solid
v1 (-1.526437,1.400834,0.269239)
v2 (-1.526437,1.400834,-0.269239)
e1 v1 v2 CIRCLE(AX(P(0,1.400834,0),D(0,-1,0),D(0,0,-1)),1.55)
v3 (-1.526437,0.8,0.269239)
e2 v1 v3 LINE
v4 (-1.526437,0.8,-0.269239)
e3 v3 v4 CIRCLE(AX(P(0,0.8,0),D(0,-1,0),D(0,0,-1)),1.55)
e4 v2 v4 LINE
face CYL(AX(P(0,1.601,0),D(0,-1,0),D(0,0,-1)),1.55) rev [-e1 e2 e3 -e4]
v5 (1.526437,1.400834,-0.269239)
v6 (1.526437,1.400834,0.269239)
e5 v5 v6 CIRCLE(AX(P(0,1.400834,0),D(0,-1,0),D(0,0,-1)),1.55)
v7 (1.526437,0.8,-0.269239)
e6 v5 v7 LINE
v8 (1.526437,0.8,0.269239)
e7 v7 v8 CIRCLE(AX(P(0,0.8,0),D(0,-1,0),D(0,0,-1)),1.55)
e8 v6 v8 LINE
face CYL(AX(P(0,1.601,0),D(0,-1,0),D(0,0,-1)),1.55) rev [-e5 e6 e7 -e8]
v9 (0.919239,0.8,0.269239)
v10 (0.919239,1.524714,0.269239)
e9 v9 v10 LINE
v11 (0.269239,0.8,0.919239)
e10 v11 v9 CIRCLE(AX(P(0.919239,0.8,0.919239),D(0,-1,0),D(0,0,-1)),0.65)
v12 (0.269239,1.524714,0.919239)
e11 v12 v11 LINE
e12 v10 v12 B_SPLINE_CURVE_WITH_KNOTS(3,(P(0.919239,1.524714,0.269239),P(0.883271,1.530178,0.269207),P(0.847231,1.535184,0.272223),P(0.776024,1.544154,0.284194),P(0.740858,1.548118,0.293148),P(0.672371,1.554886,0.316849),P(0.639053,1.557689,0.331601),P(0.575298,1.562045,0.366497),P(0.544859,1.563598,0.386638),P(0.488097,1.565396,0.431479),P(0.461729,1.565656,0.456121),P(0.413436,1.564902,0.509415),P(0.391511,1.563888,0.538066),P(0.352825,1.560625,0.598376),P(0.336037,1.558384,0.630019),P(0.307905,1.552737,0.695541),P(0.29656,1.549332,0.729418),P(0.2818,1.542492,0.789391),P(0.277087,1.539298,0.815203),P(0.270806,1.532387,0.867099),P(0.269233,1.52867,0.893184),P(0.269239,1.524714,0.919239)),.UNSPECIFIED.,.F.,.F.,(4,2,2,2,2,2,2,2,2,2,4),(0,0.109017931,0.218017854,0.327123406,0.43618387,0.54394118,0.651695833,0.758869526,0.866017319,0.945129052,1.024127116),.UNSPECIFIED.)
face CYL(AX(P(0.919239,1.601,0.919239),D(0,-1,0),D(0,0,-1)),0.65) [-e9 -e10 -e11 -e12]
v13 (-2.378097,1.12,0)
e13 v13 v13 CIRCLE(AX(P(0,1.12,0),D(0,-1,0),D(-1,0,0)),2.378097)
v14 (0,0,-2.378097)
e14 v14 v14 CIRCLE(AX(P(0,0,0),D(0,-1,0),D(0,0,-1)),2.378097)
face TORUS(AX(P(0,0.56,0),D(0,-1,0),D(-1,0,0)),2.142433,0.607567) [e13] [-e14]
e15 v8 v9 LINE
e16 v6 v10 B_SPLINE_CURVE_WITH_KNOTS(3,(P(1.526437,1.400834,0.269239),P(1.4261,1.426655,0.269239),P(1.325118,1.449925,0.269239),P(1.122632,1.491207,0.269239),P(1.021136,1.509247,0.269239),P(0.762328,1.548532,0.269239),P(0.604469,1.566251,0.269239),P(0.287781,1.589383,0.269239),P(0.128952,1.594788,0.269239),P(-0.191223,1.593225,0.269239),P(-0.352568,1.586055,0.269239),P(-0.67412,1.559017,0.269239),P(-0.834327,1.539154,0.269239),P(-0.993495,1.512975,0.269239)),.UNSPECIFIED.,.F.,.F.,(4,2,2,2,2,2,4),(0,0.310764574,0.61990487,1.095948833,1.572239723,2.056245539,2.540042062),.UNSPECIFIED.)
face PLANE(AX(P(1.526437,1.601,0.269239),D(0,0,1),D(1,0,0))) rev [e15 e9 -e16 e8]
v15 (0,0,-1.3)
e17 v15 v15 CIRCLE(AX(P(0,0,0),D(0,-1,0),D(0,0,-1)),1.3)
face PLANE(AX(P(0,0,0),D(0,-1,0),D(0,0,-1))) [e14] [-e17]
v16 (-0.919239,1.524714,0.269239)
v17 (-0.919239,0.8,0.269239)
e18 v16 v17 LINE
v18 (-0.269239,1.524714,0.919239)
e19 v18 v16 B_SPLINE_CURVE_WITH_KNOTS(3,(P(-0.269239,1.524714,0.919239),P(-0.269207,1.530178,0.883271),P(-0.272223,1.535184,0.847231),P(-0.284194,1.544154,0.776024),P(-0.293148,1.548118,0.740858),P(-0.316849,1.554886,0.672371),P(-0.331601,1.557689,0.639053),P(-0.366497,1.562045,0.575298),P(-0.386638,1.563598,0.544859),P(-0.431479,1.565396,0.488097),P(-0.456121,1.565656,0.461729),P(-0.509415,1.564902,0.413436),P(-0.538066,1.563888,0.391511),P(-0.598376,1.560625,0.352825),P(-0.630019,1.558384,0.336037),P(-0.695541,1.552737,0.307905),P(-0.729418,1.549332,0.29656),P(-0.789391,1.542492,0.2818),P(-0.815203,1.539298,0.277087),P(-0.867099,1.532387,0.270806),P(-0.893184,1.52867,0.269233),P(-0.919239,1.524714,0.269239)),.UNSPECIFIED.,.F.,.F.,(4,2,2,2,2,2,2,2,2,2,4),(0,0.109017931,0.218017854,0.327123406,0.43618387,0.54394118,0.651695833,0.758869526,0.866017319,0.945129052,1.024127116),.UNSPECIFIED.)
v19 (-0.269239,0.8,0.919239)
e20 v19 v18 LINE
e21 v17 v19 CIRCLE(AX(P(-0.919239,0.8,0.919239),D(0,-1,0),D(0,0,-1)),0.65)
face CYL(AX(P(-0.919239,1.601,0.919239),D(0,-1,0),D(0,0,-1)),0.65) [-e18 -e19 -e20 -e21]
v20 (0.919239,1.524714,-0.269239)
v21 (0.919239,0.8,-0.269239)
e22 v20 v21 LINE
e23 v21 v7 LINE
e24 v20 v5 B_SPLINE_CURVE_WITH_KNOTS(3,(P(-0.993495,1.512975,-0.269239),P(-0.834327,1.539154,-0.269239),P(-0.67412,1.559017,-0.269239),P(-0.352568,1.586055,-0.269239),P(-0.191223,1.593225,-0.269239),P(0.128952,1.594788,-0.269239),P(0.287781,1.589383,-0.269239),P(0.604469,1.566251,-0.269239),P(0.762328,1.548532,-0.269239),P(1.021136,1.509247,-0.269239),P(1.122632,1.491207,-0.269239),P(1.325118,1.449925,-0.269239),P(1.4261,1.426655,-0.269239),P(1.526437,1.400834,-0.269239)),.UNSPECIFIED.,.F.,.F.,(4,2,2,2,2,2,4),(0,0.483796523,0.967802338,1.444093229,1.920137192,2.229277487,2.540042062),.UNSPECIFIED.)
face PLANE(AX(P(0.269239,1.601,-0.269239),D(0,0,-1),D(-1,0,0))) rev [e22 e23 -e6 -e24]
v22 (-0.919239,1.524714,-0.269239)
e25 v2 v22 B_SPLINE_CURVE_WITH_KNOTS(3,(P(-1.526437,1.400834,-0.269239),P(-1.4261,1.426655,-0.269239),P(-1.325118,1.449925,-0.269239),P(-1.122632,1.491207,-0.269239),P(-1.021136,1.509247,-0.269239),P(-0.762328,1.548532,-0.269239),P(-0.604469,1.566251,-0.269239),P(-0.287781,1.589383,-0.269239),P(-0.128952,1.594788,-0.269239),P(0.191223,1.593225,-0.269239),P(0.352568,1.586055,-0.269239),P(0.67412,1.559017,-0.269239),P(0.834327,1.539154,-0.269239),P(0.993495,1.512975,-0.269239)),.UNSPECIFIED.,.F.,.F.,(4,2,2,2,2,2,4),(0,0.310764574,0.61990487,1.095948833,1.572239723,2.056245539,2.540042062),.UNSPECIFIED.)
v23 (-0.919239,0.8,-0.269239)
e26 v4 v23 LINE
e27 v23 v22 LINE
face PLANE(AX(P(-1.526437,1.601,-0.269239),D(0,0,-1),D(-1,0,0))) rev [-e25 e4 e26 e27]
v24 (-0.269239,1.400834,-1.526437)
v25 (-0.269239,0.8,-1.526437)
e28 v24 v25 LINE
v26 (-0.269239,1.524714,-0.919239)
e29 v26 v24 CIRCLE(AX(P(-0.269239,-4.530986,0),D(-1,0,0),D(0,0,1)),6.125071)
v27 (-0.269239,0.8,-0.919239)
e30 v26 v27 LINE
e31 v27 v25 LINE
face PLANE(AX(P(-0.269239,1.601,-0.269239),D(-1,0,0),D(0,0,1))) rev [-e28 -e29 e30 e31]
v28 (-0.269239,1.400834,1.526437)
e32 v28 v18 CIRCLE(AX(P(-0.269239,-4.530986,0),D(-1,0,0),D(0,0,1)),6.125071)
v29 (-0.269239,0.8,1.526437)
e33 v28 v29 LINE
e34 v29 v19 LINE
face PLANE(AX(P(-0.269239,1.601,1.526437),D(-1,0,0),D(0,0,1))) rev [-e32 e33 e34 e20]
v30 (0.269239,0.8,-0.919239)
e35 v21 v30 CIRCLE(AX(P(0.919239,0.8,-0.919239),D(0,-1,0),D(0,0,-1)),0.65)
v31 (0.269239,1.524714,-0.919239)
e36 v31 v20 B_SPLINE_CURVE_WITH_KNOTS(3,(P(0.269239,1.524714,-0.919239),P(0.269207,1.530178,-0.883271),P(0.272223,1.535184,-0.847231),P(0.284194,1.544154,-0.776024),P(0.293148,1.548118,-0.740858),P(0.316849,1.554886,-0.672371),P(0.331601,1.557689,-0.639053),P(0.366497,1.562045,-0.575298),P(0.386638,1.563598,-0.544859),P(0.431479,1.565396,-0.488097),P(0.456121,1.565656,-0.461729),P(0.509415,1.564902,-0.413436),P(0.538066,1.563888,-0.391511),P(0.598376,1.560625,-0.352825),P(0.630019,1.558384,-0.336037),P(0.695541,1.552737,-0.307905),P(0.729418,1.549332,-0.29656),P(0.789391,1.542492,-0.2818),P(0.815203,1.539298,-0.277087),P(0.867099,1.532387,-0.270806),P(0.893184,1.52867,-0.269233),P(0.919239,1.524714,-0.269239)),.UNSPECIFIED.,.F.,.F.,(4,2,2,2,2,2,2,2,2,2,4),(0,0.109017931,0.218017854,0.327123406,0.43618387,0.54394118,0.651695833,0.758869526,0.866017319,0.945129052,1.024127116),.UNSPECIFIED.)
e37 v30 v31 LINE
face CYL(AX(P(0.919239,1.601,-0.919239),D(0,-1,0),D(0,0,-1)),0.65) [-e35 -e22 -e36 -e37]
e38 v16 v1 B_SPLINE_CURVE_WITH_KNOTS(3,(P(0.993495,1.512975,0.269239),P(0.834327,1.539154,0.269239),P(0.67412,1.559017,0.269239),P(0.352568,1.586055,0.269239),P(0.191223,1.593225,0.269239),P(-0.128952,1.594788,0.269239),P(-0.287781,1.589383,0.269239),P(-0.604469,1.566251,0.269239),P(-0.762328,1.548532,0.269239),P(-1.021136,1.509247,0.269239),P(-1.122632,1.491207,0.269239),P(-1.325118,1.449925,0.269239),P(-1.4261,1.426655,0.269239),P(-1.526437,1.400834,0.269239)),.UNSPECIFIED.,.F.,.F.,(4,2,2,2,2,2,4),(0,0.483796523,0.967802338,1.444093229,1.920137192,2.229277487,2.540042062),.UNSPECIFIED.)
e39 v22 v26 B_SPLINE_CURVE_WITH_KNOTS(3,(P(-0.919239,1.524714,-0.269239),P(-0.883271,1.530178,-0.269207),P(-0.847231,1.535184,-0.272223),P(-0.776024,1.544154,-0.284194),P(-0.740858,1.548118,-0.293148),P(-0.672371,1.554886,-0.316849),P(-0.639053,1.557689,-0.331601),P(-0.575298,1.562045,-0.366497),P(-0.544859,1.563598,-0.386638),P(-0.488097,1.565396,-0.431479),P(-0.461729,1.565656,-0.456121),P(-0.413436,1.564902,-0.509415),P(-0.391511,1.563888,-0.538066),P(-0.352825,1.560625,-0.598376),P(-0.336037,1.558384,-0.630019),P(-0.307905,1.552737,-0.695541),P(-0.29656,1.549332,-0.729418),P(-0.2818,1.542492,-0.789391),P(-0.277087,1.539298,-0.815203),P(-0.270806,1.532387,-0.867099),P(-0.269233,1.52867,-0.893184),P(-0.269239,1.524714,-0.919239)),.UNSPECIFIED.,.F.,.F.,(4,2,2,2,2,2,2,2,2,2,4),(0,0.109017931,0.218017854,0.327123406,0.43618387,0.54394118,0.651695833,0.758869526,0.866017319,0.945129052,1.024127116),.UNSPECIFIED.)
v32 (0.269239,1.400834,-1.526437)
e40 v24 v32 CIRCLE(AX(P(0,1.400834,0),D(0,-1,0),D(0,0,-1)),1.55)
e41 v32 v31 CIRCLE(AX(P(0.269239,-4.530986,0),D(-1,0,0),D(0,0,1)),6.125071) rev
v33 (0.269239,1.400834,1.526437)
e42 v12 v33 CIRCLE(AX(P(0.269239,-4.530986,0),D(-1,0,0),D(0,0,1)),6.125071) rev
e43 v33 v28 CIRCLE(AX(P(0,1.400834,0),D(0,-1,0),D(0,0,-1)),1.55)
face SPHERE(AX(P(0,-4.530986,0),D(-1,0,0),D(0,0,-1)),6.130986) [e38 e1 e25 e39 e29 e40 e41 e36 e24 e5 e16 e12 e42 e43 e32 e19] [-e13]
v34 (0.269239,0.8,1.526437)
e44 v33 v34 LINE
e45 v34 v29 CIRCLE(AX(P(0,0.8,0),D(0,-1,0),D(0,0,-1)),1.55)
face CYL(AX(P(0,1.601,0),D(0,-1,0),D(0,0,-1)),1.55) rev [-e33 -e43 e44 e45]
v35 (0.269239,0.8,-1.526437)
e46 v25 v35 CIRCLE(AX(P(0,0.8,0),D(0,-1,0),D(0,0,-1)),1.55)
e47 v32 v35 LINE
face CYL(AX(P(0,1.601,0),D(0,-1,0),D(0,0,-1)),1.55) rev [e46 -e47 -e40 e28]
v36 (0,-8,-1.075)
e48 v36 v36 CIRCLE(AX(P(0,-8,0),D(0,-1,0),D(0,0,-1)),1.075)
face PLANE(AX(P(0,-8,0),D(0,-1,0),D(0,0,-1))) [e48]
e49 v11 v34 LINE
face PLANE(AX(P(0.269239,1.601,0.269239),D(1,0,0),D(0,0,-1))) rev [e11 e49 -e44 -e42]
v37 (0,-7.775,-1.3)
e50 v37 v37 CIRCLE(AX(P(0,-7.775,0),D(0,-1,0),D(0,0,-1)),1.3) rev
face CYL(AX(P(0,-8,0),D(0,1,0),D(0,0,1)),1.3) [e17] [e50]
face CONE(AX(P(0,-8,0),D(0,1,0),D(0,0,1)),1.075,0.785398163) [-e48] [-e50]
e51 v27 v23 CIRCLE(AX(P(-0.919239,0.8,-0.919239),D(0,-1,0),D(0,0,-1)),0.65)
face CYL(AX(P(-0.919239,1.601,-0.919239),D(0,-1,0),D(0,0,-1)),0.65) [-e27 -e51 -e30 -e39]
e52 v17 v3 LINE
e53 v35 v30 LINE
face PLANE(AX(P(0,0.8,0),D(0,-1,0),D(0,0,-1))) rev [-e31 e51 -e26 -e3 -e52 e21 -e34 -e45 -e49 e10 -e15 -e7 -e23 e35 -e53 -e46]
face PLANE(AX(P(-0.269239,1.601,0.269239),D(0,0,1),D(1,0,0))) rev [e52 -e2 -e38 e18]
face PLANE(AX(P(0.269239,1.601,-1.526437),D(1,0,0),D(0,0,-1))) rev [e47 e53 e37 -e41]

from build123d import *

# Parameters (mm, degrees)
CUT_EXTRUDE1_REACH = 11.621
CHAMFER1_SIZE      = 0.225
FILLET1_R          = 0.65


with BuildPart() as part:
    # Boss-Extrude1: read off the stored shape, not the designer's step
    # Boss-Extrude1 outline → Boss-Extrude1 (revolve)
    with BuildSketch(Plane.XY):
        with BuildLine():
            ThreePointArc((2.378097174, 1.12), (1.213027841, 1.478802074), (0, 1.6))
            Line((0, 1.6), (0, -8))
            Line((0, -8), (1.3, -8))
            Line((1.3, -8), (1.3, 0))
            Line((1.3, 0), (2.378097174, 0))
            ThreePointArc((2.378097174, 0), (2.75, 0.56), (2.378097174, 1.12))
        make_face()
    revolve(axis=Axis((0, 0, 0), (0, 1, 0)))

    # Sketch2 → Cut-Extrude1 (cut, up to next)
    with BuildSketch(Plane.XZ.offset(-0.8), mode=Mode.PRIVATE) as cut_extrude1_sk1:
        with BuildLine():
            Line((-0.269238816, 1.526437179), (-0.269238816, 0.269238816))
            Line((-0.269238816, 0.269238816), (-1.526437179, 0.269238816))
            ThreePointArc((-1.526437179, 0.269238816), (-1.55, 0), (-1.526437179, -0.269238816))
            Line((-1.526437179, -0.269238816), (-0.269238816, -0.269238816))
            Line((-0.269238816, -0.269238816), (-0.269238816, -1.526437179))
            ThreePointArc((-0.269238816, -1.526437179), (0, -1.55), (0.269238816, -1.526437179))
            Line((0.269238816, -1.526437179), (0.269238816, -0.269238816))
            Line((0.269238816, -0.269238816), (1.526437179, -0.269238816))
            ThreePointArc((1.526437179, -0.269238816), (1.55, 0), (1.526437179, 0.269238816))
            Line((1.526437179, 0.269238816), (0.269238816, 0.269238816))
            Line((0.269238816, 0.269238816), (0.269238816, 1.526437179))
            ThreePointArc((0.269238816, 1.526437179), (0, 1.55), (-0.269238816, 1.526437179))
        make_face()
    cut_extrude1_tool1 = extrude(cut_extrude1_sk1.sketch, amount=-CUT_EXTRUDE1_REACH, mode=Mode.PRIVATE) & part.part
    add(cut_extrude1_tool1.solids().sort_by_distance((0, 0.8, 0))[0], mode=Mode.SUBTRACT)

    # Chamfer1
    chamfer1_edges = [part.edges().sort_by_distance(p)[0] for p in [
        (-1.3, -8, 0),
    ]]
    chamfer(chamfer1_edges, length=CHAMFER1_SIZE)

    # Fillet1
    fillet1_edges = [part.edges().sort_by_distance(p)[0] for p in [
        (-0.269238816, 1.194082552, 0.269238816),
        (0.269238816, 1.194082552, 0.269238816),
        (-0.269238816, 1.194082552, -0.269238816),
        (0.269238816, 1.194082552, -0.269238816),
    ]]
    fillet(fillet1_edges, radius=FILLET1_R)


solid = part.part
